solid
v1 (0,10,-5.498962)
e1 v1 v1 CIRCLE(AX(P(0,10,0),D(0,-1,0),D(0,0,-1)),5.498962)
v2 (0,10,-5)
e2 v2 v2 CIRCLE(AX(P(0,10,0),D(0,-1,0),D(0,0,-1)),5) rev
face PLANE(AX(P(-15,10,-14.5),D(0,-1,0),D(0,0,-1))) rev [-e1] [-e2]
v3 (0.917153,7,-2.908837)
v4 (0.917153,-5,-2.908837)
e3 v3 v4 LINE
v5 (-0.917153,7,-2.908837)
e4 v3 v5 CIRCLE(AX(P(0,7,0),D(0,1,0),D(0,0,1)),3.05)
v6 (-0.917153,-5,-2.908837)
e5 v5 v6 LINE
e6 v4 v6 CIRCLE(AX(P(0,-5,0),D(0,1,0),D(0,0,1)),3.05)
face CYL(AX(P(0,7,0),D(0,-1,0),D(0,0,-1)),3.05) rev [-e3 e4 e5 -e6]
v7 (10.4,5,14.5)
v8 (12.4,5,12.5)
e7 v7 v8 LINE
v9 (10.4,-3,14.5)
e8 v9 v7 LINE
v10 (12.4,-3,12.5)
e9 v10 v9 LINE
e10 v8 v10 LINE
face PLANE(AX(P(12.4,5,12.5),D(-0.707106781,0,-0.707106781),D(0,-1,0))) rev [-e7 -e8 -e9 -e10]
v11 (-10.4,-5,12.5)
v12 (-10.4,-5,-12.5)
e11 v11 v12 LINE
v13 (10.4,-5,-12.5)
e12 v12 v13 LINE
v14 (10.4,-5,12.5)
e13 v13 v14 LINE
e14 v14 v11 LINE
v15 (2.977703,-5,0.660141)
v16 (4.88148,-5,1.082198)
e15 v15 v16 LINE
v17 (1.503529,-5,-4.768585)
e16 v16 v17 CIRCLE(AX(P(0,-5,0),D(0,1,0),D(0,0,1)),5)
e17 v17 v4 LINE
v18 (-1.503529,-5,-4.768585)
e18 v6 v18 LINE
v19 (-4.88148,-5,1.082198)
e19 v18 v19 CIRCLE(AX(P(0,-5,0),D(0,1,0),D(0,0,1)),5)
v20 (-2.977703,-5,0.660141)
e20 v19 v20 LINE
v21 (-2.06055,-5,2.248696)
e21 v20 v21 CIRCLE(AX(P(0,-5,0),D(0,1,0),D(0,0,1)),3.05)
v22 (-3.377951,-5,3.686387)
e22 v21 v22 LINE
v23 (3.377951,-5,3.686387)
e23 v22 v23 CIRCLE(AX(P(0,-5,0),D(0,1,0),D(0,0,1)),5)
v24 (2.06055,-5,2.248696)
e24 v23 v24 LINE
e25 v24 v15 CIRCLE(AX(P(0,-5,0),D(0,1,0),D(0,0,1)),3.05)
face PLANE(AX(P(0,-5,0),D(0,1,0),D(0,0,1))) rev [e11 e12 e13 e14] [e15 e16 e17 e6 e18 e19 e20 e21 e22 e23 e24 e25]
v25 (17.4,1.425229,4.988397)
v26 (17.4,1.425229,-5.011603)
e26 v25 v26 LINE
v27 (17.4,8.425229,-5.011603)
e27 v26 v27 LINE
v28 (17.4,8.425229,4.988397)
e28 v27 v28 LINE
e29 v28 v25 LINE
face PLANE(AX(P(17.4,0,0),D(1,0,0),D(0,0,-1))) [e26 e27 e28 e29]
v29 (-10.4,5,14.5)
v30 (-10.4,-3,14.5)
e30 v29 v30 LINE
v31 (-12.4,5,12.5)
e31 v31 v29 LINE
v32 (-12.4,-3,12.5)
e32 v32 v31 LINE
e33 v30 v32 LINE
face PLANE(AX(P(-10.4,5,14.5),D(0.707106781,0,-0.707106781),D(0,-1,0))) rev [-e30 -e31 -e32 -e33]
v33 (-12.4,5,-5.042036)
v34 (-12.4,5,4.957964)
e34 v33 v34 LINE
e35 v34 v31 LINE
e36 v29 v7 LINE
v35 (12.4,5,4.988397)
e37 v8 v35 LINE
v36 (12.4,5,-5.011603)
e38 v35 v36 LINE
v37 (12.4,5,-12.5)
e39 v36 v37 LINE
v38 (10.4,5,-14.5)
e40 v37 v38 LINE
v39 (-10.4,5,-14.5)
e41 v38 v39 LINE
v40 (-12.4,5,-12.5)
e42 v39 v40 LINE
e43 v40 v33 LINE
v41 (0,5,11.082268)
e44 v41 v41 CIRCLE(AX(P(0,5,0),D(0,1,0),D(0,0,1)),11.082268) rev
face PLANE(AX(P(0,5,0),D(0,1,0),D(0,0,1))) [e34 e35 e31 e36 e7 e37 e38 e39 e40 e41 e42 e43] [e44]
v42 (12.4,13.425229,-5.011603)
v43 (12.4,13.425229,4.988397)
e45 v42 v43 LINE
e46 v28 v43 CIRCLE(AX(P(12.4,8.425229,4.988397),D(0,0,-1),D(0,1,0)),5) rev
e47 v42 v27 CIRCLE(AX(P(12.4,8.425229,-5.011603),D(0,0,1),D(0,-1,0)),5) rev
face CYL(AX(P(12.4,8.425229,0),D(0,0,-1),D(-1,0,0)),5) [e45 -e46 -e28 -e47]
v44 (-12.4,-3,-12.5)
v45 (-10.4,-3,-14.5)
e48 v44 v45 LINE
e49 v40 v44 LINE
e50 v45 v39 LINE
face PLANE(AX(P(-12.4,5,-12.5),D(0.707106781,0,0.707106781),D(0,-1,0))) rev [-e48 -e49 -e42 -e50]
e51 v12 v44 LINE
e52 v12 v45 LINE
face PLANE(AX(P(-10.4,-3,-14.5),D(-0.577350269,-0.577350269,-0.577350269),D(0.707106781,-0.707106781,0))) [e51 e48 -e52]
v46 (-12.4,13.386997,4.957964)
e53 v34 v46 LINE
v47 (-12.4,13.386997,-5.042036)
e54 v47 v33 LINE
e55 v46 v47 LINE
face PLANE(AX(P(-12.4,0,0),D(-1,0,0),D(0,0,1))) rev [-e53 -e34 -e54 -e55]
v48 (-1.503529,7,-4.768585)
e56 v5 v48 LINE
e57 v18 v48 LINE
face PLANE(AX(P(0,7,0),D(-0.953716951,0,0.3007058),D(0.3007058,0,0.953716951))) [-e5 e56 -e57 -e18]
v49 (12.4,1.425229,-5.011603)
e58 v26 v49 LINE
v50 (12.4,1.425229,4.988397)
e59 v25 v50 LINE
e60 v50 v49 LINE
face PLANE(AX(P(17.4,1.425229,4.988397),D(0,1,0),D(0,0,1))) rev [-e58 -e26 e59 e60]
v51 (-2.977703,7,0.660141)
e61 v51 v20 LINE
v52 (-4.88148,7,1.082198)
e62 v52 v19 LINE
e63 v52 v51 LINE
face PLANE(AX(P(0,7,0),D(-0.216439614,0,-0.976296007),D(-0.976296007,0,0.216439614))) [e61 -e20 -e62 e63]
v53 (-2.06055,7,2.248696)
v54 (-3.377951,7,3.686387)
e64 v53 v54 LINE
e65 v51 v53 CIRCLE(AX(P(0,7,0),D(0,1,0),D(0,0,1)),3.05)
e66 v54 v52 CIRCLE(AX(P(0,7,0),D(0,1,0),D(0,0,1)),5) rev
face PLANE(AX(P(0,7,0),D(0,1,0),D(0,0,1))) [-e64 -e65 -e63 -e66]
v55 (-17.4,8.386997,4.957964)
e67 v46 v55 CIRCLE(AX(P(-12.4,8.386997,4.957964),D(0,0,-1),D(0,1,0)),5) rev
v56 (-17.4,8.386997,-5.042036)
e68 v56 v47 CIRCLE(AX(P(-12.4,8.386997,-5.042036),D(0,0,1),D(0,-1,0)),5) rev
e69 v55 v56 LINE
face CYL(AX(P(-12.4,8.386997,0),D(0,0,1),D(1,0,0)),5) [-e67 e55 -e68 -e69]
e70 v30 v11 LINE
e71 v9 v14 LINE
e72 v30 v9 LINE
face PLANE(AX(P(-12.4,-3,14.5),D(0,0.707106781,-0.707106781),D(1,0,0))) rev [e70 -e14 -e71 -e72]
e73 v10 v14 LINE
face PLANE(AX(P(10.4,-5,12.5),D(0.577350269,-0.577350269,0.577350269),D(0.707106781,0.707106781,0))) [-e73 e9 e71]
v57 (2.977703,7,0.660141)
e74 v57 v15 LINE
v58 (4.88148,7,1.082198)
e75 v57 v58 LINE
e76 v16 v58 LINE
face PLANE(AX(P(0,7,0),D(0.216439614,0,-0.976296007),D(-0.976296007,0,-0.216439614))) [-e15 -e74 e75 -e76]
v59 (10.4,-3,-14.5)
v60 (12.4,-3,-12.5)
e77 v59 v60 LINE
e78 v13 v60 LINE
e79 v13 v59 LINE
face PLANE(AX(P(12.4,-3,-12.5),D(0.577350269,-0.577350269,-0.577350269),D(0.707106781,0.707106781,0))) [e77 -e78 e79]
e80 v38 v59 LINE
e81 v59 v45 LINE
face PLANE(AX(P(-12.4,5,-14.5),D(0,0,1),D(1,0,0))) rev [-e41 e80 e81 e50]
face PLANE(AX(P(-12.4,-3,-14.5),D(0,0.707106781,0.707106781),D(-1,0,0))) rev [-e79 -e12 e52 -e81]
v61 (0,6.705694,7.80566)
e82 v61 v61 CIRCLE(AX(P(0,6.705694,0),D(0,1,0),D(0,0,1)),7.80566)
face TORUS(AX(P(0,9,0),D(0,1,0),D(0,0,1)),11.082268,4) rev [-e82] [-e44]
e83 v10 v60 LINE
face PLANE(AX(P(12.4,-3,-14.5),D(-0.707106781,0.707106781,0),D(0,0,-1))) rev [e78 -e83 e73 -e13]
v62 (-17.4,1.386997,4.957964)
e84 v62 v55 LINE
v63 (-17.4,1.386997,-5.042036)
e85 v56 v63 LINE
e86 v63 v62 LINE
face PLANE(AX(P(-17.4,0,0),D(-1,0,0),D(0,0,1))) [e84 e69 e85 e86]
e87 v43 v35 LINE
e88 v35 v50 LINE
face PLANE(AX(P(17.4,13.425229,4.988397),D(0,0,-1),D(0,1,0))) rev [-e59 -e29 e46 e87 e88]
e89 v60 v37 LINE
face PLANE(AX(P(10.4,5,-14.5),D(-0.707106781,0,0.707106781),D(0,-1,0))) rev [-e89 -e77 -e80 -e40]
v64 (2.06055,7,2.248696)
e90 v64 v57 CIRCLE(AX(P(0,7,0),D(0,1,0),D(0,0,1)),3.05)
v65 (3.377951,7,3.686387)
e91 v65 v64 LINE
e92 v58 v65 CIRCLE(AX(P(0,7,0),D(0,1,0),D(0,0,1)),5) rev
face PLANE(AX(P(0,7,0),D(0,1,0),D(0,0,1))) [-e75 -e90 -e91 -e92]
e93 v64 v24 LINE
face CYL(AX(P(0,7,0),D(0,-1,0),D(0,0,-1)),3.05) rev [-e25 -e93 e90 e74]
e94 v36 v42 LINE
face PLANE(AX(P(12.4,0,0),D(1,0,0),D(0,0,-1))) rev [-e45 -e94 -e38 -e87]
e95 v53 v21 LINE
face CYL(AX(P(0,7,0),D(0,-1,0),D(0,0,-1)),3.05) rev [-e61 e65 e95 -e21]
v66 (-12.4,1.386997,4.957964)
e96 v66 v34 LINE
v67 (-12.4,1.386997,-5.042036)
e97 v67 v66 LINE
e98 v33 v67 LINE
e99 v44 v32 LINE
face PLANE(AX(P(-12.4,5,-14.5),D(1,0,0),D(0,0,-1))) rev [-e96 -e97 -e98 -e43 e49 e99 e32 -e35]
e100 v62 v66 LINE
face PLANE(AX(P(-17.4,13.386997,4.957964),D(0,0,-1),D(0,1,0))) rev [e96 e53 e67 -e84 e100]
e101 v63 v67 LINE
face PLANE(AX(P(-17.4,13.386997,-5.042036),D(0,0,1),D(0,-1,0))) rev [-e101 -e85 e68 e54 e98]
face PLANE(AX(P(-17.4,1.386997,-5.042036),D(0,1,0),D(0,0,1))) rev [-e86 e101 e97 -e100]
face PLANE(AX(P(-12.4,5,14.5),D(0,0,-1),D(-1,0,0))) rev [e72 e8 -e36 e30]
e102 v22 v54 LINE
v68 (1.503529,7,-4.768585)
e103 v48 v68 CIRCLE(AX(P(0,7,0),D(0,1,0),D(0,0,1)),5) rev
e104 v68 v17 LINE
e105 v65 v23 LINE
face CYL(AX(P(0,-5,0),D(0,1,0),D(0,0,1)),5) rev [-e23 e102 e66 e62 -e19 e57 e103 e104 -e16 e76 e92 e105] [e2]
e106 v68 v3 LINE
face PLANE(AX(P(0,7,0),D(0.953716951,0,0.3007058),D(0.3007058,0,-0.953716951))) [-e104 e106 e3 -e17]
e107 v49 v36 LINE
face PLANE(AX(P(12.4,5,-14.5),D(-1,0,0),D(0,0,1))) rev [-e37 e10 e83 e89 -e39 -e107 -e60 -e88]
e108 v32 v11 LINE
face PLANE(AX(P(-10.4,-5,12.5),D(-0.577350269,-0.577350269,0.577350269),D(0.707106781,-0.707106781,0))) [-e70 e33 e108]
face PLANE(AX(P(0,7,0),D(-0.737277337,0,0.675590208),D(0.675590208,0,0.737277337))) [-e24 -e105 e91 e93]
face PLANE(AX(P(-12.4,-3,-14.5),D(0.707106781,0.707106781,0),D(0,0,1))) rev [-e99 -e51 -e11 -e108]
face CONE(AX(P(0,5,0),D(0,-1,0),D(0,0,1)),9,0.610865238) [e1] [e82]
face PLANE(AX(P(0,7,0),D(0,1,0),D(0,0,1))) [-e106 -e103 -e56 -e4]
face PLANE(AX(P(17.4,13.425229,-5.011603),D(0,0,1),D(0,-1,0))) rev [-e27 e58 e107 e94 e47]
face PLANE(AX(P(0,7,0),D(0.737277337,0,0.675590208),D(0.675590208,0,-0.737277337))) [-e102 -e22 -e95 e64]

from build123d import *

# Parameters (mm, degrees)
SKETCH1_W           = 24.8
SKETCH1_H           = 29
BOSS_EXTRUDE1_DEPTH = 5
SKETCH2_R           = 9
BOSS_EXTRUDE2_DEPTH = 5.8
BOSS_EXTRUDE2_TAPER = 35
SKETCH4_R           = 5
CUT_EXTRUDE2_DEPTH  = 25.771959955
BOSS_EXTRUDE3_DEPTH = 12
CHAMFER1_SIZE       = 2
FILLET2_R           = 4
SKETCH6_W           = 30
SKETCH6_H           = 2
CUT_EXTRUDE3_DEPTH  = 34.309452563
SKETCH7_W           = 10
SKETCH7_H           = 12
BOSS_EXTRUDE4_DEPTH = 5
SKETCH9_W           = 10
SKETCH9_H           = 12
BOSS_EXTRUDE5_DEPTH = 5
FILLET3_R           = 5


with BuildPart() as part:
    # Sketch1 → Boss-Extrude1 (new, symmetric)
    with BuildSketch(Plane(origin=(0, 0, 0), x_dir=(1, 0, 0), z_dir=(0, 1, 0))):
        Rectangle(SKETCH1_W, SKETCH1_H)
    extrude(amount=BOSS_EXTRUDE1_DEPTH, both=True)

    # Sketch2 → Boss-Extrude2 (add)
    with BuildSketch(Plane(origin=(0, 5, 0), x_dir=(1, 0, 0), z_dir=(0, 1, 0))):
        Circle(SKETCH2_R)
    extrude(amount=BOSS_EXTRUDE2_DEPTH, taper=BOSS_EXTRUDE2_TAPER)

    # Sketch4 → Cut-Extrude2 (cut, through all)
    with BuildSketch(Plane(origin=(0, 10.8, 0), x_dir=(1, 0, 0), z_dir=(0, 1, 0))):
        with Locations(Location((0, 0, 0), (0, 0, 270))):
            Circle(SKETCH4_R)
    extrude(amount=-CUT_EXTRUDE2_DEPTH, mode=Mode.SUBTRACT)

    # Sketch5 → Boss-Extrude3 (add)
    with BuildSketch(Plane(origin=(0, -5, 0), x_dir=(1, 0, 0), z_dir=(0, 1, 0))):
        with BuildLine():
            Line((-1.533599577, 4.863956449), (-0.917152688, 2.9088367))
            ThreePointArc((-0.917152688, 2.9088367), (0, 3.05), (0.917152688, 2.9088367))
            Line((0.917152688, 2.9088367), (1.533599577, 4.863956449))
            ThreePointArc((1.533599577, 4.863956449), (0, 5.1), (-1.533599577, 4.863956449))
        make_face()
        with BuildLine():
            Line((3.445510059, -3.760114418), (2.060550133, -2.248695877))
            ThreePointArc((2.060550133, -2.248695877), (2.641377482, -1.525), (2.977702822, -0.660140823))
            Line((2.977702822, -0.660140823), (4.979109636, -1.103842031))
            ThreePointArc((4.979109636, -1.103842031), (4.416729559, -2.55), (3.445510059, -3.760114418))
        make_face()
        with BuildLine():
            Line((-4.979109636, -1.103842031), (-2.977702822, -0.660140823))
            ThreePointArc((-2.977702822, -0.660140823), (-2.641377482, -1.525), (-2.060550133, -2.248695877))
            Line((-2.060550133, -2.248695877), (-3.445510059, -3.760114418))
            ThreePointArc((-3.445510059, -3.760114418), (-4.416729559, -2.55), (-4.979109636, -1.103842031))
        make_face()
    extrude(amount=BOSS_EXTRUDE3_DEPTH)

    # Chamfer1
    chamfer1_edges = [part.edges().sort_by_distance(p)[0] for p in [
        (0, -5, 14.5),
        (-12.4, -5, 0),
        (0, -5, -14.5),
        (12.4, -5, 0),
        (12.4, 0, 14.5),
        (-12.4, 0, 14.5),
        (-12.4, 0, -14.5),
        (12.4, 0, -14.5),
    ]]
    chamfer(chamfer1_edges, length=CHAMFER1_SIZE)

    # Fillet2
    fillet2_edges = [part.edges().sort_by_distance(p)[0] for p in [
        (-9, 5, 0),
    ]]
    fillet(fillet2_edges, radius=FILLET2_R)

    # Sketch6 → Cut-Extrude3 (cut, through all)
    with BuildSketch(Plane.XY.offset(14.5)):
        with Locations((0, 11)):
            Rectangle(SKETCH6_W, SKETCH6_H)
    extrude(amount=-CUT_EXTRUDE3_DEPTH, mode=Mode.SUBTRACT)

    # Sketch7 → Boss-Extrude4 (add)
    with BuildSketch(Plane.ZY.offset(12.4)):
        with Locations((-0.042035607, 7.386997459)):
            Rectangle(SKETCH7_W, SKETCH7_H)
    extrude(amount=BOSS_EXTRUDE4_DEPTH)

    # Sketch9 → Boss-Extrude5 (add)
    with BuildSketch(Plane(origin=(12.4, 0, 0), x_dir=(0, 0, -1), z_dir=(1, 0, 0))):
        with Locations((0.01160307, 7.425228999)):
            Rectangle(SKETCH9_W, SKETCH9_H)
    extrude(amount=BOSS_EXTRUDE5_DEPTH)

    # Fillet3
    fillet3_edges = [part.edges().sort_by_distance(p)[0] for p in [
        (17.4, 13.425228999, -0.01160307),
        (-17.4, 13.386997459, -0.042035607),
    ]]
    fillet(fillet3_edges, radius=FILLET3_R - 0.0001)  # a hair under: the kernel refuses the full size


solid = part.part
